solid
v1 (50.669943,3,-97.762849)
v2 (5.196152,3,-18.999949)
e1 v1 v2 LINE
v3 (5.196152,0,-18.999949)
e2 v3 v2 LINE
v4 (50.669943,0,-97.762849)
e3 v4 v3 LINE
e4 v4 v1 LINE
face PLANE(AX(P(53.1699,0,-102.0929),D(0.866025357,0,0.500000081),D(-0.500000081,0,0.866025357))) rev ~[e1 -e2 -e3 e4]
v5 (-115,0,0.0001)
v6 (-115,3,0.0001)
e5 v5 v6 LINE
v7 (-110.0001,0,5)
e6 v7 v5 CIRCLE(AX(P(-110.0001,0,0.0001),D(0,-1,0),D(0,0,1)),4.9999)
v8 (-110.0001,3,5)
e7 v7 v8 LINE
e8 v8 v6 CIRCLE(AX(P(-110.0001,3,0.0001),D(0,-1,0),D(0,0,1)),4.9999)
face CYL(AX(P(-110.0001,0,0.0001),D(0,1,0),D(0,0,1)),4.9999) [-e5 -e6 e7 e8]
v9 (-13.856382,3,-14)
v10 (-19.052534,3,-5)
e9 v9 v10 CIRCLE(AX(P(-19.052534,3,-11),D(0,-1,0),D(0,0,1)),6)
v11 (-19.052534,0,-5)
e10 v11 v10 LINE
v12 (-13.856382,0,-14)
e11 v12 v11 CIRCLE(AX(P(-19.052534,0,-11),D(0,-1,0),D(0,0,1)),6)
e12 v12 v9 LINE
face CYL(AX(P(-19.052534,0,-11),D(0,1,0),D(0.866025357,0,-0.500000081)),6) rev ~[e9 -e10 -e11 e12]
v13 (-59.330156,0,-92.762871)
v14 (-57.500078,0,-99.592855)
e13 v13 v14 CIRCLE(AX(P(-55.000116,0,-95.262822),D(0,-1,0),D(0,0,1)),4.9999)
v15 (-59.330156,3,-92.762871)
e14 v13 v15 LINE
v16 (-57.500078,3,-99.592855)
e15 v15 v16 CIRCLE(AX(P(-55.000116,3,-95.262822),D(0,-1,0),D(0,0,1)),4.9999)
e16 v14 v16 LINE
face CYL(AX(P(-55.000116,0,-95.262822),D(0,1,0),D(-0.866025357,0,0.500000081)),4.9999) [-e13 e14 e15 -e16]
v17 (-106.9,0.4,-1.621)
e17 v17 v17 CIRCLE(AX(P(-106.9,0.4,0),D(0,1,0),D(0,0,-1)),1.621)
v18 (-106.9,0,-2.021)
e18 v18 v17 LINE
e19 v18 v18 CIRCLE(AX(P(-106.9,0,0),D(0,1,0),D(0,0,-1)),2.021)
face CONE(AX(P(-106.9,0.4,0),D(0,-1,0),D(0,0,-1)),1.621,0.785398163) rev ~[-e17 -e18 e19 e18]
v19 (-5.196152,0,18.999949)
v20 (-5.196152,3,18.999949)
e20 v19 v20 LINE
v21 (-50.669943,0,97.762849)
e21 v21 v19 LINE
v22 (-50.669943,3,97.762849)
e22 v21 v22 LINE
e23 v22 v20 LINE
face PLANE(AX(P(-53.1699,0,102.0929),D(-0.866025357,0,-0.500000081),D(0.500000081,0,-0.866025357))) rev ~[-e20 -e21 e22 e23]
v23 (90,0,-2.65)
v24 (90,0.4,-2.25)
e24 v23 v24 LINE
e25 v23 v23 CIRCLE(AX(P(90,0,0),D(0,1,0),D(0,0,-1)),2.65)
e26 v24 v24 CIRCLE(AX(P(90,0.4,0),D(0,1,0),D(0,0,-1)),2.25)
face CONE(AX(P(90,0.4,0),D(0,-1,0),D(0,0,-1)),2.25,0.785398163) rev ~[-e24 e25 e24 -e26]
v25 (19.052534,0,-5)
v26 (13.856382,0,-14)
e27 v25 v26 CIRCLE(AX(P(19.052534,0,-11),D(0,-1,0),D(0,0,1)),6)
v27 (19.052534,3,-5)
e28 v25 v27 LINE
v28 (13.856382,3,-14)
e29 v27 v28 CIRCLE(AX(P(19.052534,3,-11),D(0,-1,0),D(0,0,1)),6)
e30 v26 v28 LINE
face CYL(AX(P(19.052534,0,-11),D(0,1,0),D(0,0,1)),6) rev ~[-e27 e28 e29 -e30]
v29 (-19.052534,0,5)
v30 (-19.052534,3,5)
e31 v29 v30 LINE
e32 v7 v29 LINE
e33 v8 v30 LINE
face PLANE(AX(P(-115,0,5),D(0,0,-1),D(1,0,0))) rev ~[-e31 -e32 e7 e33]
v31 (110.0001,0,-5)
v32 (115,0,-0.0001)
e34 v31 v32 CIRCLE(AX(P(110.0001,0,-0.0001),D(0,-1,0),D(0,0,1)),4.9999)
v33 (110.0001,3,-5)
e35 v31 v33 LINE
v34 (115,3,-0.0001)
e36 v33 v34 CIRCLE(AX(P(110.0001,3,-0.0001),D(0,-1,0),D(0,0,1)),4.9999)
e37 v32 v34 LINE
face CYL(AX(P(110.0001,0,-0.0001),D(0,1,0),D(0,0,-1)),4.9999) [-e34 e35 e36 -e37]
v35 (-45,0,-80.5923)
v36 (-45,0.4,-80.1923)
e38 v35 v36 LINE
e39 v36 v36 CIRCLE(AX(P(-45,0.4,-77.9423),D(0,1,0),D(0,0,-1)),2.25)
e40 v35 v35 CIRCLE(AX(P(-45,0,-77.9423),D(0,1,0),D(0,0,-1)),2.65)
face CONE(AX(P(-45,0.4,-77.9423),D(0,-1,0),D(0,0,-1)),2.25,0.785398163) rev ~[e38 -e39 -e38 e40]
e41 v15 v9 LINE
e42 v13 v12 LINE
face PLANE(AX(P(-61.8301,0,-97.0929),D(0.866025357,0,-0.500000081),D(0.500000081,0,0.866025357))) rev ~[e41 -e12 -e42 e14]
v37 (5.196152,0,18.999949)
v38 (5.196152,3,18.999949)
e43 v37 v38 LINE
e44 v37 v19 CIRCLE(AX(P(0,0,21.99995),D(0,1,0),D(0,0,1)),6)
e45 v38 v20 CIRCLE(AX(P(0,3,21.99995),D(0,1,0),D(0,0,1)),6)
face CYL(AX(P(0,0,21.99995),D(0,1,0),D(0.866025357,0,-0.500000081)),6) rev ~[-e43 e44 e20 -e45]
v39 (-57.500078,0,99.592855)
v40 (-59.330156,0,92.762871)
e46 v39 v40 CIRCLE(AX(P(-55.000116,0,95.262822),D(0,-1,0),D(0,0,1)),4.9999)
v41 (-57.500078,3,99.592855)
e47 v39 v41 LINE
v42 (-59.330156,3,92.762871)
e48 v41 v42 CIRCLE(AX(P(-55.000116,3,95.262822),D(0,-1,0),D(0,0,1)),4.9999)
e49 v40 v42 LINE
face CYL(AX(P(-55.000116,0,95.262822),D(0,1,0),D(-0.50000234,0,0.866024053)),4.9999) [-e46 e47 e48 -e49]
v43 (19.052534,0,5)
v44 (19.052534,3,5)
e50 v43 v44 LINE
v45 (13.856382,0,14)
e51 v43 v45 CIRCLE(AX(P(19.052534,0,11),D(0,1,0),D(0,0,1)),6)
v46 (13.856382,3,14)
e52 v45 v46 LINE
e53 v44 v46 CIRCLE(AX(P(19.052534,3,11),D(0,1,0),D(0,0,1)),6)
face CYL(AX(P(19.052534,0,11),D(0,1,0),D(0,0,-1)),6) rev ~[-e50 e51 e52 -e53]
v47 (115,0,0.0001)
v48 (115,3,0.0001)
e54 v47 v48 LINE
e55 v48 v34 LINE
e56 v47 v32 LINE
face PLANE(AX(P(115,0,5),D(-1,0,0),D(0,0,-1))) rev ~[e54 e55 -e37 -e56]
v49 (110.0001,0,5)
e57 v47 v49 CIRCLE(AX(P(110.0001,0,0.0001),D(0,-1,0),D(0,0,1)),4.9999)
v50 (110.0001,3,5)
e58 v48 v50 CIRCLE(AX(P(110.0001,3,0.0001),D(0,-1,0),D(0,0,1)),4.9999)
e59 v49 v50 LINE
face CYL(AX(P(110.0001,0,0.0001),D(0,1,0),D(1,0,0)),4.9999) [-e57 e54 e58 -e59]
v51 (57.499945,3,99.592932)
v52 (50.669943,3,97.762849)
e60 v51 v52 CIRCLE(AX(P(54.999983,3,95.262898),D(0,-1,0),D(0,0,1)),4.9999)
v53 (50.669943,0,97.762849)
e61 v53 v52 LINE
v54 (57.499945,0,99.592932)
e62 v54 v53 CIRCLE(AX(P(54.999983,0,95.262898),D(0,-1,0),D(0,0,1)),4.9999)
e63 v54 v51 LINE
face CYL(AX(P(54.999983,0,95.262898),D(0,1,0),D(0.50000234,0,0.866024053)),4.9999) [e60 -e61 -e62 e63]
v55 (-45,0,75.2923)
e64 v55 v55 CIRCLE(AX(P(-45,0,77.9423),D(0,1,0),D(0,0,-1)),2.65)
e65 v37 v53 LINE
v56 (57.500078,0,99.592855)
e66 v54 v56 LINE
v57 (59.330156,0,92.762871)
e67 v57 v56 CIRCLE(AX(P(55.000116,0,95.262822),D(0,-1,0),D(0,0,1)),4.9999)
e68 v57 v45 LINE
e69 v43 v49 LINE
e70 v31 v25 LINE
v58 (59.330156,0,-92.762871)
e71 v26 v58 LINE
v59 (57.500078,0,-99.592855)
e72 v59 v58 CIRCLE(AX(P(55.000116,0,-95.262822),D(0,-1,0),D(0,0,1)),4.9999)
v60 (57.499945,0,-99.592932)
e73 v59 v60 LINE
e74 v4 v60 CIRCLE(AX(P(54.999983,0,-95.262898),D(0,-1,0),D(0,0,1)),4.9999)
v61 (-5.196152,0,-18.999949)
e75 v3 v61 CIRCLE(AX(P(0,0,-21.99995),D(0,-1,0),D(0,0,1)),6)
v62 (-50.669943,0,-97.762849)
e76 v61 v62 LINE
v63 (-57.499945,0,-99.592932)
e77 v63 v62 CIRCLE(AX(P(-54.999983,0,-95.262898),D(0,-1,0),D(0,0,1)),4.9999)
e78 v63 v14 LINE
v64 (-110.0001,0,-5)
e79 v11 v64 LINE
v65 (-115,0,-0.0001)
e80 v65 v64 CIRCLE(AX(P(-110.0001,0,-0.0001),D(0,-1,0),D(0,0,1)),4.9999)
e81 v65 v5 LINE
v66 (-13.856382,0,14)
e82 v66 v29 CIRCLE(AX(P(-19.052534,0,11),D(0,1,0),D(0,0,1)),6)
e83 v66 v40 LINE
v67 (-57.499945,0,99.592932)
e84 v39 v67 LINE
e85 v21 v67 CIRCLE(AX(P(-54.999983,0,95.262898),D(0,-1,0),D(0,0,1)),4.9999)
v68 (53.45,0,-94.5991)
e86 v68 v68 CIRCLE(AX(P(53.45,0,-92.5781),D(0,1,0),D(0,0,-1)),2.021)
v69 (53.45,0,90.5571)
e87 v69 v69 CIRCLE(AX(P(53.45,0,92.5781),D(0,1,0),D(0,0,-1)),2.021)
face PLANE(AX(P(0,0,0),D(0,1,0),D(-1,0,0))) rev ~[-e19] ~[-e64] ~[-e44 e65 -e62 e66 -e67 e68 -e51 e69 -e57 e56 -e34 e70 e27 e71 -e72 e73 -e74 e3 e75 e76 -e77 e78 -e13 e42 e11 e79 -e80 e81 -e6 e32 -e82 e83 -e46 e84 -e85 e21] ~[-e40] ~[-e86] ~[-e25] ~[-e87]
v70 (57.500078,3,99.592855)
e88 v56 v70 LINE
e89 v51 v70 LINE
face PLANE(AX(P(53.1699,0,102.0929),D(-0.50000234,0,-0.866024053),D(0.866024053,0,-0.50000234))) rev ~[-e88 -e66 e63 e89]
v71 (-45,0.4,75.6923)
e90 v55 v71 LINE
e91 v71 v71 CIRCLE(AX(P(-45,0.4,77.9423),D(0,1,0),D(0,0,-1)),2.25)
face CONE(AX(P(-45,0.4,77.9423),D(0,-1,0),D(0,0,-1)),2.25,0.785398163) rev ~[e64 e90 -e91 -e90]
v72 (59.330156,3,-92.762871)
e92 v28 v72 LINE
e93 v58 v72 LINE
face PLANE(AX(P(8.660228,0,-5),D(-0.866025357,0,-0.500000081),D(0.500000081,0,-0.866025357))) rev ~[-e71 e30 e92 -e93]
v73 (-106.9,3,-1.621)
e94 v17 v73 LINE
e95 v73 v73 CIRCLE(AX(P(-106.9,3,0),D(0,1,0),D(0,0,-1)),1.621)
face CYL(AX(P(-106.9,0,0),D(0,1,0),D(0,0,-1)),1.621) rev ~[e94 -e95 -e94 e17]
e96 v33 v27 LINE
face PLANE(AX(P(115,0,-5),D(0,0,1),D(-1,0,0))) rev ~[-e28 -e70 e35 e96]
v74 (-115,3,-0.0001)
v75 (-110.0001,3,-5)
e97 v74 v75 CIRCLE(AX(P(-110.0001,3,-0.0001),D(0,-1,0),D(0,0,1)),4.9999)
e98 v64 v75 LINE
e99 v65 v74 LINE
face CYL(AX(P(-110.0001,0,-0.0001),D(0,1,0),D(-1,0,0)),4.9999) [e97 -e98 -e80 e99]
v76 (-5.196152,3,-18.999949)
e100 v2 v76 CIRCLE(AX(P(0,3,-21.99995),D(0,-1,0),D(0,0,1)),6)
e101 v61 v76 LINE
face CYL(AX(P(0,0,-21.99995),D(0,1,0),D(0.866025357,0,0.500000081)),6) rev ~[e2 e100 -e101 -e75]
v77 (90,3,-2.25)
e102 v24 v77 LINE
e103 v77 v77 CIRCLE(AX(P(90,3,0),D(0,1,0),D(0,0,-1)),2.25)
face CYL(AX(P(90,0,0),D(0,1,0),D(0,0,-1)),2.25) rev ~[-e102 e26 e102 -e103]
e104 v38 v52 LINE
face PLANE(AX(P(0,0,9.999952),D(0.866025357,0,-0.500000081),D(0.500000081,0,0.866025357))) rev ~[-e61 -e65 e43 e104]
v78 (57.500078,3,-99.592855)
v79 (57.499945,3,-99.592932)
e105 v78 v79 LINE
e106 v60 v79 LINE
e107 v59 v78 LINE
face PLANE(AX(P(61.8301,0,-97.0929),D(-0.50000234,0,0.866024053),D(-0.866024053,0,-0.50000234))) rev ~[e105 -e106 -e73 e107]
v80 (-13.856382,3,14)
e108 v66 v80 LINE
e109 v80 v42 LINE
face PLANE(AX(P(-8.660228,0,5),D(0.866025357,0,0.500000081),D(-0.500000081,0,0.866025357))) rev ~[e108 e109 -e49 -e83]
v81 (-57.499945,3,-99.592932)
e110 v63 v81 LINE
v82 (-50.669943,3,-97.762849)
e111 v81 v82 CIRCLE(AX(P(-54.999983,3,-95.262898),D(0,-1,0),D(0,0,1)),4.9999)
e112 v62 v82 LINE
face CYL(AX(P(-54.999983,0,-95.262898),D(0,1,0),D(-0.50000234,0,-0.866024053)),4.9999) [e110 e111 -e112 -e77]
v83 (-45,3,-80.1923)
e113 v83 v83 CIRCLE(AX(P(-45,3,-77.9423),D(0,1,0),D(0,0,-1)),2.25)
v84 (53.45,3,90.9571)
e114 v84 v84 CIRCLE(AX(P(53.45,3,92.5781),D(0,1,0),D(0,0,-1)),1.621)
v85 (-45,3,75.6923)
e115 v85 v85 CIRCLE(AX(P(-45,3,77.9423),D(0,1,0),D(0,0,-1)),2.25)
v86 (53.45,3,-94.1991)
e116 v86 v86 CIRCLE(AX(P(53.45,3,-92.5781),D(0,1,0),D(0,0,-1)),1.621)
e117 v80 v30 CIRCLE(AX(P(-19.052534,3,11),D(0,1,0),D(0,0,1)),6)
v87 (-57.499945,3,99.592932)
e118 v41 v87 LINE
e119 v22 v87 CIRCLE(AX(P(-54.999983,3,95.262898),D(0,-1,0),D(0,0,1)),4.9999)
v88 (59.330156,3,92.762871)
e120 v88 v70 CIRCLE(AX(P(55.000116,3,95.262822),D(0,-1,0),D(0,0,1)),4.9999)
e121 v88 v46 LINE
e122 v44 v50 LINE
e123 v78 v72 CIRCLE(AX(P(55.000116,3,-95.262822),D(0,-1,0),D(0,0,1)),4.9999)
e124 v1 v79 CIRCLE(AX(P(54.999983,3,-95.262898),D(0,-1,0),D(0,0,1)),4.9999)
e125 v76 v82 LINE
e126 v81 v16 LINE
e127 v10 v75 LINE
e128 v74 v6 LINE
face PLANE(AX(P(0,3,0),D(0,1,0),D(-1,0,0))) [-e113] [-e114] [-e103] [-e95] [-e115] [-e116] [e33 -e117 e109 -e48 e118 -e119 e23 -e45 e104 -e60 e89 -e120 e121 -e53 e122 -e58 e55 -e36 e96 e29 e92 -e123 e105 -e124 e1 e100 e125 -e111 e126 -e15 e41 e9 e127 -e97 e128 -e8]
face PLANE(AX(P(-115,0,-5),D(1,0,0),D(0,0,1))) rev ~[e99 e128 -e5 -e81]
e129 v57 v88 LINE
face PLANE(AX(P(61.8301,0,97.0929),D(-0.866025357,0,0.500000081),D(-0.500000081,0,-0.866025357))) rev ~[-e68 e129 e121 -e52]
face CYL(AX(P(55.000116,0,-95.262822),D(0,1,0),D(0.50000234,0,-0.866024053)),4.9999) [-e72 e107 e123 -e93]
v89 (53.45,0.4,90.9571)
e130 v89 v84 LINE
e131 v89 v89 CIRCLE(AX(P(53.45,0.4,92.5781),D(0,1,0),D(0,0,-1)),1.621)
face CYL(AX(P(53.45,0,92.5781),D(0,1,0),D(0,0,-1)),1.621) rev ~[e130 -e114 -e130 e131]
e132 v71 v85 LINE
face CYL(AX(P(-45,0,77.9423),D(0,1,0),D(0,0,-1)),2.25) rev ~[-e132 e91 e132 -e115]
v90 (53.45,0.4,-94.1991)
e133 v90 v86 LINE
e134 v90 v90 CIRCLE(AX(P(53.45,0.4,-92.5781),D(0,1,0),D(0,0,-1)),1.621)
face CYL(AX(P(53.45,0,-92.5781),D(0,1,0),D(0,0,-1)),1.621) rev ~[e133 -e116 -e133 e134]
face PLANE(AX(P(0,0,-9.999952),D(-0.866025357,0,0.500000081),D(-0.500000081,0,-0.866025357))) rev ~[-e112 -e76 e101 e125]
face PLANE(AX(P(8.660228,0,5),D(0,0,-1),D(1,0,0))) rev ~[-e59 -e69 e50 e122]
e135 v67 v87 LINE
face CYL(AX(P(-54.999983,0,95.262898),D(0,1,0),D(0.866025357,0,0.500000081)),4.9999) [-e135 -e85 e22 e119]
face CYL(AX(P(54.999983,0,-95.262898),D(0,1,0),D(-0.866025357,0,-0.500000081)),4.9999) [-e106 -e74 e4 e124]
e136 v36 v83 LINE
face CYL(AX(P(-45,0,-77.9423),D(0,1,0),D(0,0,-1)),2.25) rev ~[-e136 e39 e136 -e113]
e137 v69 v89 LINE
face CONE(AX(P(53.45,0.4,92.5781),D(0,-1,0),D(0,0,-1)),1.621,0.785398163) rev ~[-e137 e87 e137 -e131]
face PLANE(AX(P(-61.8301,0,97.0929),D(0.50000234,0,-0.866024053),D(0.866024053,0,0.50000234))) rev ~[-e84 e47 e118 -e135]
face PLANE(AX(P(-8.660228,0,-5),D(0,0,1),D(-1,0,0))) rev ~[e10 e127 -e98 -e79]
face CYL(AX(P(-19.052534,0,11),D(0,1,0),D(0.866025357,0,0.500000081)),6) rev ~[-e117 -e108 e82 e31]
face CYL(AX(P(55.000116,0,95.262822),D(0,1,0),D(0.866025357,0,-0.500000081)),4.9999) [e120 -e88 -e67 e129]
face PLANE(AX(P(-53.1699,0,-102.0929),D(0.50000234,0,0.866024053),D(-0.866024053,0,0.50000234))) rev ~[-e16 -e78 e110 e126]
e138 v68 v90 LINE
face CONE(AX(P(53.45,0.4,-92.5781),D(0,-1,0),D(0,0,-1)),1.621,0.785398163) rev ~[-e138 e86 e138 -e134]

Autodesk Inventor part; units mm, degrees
ref_plane "YZ Plane" through (0, 0, 0) normal (1, 0, 0) x (0, 1, 0)
ref_plane "XZ Plane" through (0, 0, 0) normal (0, 1, 0) x (-1, 0, 0)
ref_plane "XY Plane" through (0, 0, 0) normal (0, 0, 1) x (1, 0, 0)
sketch "Szkic1" plane through (0, 0, 0) normal (0, 1, 0) x (-1, 0, 0)
  line L0 (-115, -5) -> (115, -5)
  line L1 (115, -5) -> (115, 5)
  line L2 (115, 5) -> (-115, 5)
  line L3 (-115, 5) -> (-115, -5)
  line L4 (-53.1699, -102.0929) -> (61.8301, 97.0929)
  line L5 (53.1699, 102.0929) -> (-61.8301, -97.0929)
  line L6 (-61.8301, -97.0929) -> (-53.1699, -102.0929)
  line L7 (61.8301, 97.0929) -> (53.1699, 102.0929)
  line L8 (61.8301, -97.0929) -> (-53.1699, 102.0929)
  line L9 (-61.8301, 97.0929) -> (53.1699, -102.0929)
  line L10 (53.1699, -102.0929) -> (61.8301, -97.0929)
  line L11 (-53.1699, 102.0929) -> (-61.8301, 97.0929)
  line L12 (115, 5) -> (-115, 5)
  line L13 (-115, -5) -> (115, -5)
  line L14 (115, -5) -> (115, 5)
  line L15 (-115, 5) -> (-115, -5)
  line L16 (53.1699, 102.0929) -> (-61.8301, -97.0929)
  line L17 (-53.1699, -102.0929) -> (61.8301, 97.0929)
  line L18 (61.8301, 97.0929) -> (53.1699, 102.0929)
  line L19 (-61.8301, -97.0929) -> (-53.1699, -102.0929)
  line L20 (-61.8301, 97.0929) -> (53.1699, -102.0929)
  line L21 (61.8301, -97.0929) -> (-53.1699, 102.0929)
  line L22 (-53.1699, 102.0929) -> (-61.8301, 97.0929)
  line L23 (53.1699, -102.0929) -> (61.8301, -97.0929)
  point P0 (0, 0)
  dimension "d6" = 10
  dimension "d7" = 5
  dimension "d8" = 230
  dimension "d9" = 115
  dimension "d12" = 360
extrude "Wyciągnięcie proste2" add sketch "Szkic1" along normal blind 3
sketch "Szkic2" plane through (0, 0, 0) normal (0, -1, 0) x (1, 0, 0)
  line L0 (-53.1699, 102.0929) -> (0, 10) projected
  line L1 (-61.8301, 97.0929) -> (-53.1699, 102.0929) projected
  point P0 (0, 0)
  point P1 (-45, 77.9423)
  point P2 (-45, -77.9423)
  point P3 (90, 0)
  dimension "d48" = 360
fillet "Zaokrąglenie3" radius 6 6 edges at (8.6603, 1.5, 5) (0, 1.5, 10) (-8.6603, 1.5, 5) (-8.6603, 1.5, -5) (0, 1.5, -10) (8.6603, 1.5, -5)
fillet "Zaokrąglenie4" radius 5 2 edges at (-53.1699, 1.5, 102.0929) (-61.8301, 1.5, 97.0929)
sketch "Szkic3" plane through (0, 0, 0) normal (0, -1, 0) x (1, 0, 0)
  point P0 (0, 0)
  point P1 (0, 0)
pattern_circular "Szyk kołowy1" count 6 over 360 about axis through (0, 0, 0) along (0, -1, 0) of "Zaokrąglenie4"
hole "Otwór1" at (-45, 0, 77.9423) at (-45, 0, -77.9423) at (90, 0, 0) direction (0, 1, 0) diameter 4.5 end through all clearance for "Śruba ze łbem stożkowym ISO 2009/7046" size "M4" standard "ISO"
sketch "Szkic4" plane through (0, 0, 0) normal (0, -1, 0) x (1, 0, 0)
  circle A0 centre (0, 0) radius 106.9
  line L0 (0, 0) -> (-125.8998, 0)
  point P0 (-106.9, 0)
  point P1 (53.45, -92.5781)
  point P2 (53.45, 92.5781)
  dimension "d57" = 213.8
  dimension "d60" = 360
hole "Otwór2" at (-106.9, 0, 0) at (53.45, 0, -92.5781) at (53.45, 0, 92.5781) direction (0, 1, 0) diameter 3.242 end through all thread size "M4x0.7" class "6H" standard "ISO Metric profile"
chamfer "Faza1" distance 0.4 angle 45 6 edges at (53.45, 0, -90.9571) (90, 0, 2.25) (-45, 0, -75.6923) (-106.9, 0, 1.621) (-45, 0, 80.1923) (53.45, 0, 94.1991)
properties part number "SpiderPrimaryMirror" material "Aluminium 6061"
